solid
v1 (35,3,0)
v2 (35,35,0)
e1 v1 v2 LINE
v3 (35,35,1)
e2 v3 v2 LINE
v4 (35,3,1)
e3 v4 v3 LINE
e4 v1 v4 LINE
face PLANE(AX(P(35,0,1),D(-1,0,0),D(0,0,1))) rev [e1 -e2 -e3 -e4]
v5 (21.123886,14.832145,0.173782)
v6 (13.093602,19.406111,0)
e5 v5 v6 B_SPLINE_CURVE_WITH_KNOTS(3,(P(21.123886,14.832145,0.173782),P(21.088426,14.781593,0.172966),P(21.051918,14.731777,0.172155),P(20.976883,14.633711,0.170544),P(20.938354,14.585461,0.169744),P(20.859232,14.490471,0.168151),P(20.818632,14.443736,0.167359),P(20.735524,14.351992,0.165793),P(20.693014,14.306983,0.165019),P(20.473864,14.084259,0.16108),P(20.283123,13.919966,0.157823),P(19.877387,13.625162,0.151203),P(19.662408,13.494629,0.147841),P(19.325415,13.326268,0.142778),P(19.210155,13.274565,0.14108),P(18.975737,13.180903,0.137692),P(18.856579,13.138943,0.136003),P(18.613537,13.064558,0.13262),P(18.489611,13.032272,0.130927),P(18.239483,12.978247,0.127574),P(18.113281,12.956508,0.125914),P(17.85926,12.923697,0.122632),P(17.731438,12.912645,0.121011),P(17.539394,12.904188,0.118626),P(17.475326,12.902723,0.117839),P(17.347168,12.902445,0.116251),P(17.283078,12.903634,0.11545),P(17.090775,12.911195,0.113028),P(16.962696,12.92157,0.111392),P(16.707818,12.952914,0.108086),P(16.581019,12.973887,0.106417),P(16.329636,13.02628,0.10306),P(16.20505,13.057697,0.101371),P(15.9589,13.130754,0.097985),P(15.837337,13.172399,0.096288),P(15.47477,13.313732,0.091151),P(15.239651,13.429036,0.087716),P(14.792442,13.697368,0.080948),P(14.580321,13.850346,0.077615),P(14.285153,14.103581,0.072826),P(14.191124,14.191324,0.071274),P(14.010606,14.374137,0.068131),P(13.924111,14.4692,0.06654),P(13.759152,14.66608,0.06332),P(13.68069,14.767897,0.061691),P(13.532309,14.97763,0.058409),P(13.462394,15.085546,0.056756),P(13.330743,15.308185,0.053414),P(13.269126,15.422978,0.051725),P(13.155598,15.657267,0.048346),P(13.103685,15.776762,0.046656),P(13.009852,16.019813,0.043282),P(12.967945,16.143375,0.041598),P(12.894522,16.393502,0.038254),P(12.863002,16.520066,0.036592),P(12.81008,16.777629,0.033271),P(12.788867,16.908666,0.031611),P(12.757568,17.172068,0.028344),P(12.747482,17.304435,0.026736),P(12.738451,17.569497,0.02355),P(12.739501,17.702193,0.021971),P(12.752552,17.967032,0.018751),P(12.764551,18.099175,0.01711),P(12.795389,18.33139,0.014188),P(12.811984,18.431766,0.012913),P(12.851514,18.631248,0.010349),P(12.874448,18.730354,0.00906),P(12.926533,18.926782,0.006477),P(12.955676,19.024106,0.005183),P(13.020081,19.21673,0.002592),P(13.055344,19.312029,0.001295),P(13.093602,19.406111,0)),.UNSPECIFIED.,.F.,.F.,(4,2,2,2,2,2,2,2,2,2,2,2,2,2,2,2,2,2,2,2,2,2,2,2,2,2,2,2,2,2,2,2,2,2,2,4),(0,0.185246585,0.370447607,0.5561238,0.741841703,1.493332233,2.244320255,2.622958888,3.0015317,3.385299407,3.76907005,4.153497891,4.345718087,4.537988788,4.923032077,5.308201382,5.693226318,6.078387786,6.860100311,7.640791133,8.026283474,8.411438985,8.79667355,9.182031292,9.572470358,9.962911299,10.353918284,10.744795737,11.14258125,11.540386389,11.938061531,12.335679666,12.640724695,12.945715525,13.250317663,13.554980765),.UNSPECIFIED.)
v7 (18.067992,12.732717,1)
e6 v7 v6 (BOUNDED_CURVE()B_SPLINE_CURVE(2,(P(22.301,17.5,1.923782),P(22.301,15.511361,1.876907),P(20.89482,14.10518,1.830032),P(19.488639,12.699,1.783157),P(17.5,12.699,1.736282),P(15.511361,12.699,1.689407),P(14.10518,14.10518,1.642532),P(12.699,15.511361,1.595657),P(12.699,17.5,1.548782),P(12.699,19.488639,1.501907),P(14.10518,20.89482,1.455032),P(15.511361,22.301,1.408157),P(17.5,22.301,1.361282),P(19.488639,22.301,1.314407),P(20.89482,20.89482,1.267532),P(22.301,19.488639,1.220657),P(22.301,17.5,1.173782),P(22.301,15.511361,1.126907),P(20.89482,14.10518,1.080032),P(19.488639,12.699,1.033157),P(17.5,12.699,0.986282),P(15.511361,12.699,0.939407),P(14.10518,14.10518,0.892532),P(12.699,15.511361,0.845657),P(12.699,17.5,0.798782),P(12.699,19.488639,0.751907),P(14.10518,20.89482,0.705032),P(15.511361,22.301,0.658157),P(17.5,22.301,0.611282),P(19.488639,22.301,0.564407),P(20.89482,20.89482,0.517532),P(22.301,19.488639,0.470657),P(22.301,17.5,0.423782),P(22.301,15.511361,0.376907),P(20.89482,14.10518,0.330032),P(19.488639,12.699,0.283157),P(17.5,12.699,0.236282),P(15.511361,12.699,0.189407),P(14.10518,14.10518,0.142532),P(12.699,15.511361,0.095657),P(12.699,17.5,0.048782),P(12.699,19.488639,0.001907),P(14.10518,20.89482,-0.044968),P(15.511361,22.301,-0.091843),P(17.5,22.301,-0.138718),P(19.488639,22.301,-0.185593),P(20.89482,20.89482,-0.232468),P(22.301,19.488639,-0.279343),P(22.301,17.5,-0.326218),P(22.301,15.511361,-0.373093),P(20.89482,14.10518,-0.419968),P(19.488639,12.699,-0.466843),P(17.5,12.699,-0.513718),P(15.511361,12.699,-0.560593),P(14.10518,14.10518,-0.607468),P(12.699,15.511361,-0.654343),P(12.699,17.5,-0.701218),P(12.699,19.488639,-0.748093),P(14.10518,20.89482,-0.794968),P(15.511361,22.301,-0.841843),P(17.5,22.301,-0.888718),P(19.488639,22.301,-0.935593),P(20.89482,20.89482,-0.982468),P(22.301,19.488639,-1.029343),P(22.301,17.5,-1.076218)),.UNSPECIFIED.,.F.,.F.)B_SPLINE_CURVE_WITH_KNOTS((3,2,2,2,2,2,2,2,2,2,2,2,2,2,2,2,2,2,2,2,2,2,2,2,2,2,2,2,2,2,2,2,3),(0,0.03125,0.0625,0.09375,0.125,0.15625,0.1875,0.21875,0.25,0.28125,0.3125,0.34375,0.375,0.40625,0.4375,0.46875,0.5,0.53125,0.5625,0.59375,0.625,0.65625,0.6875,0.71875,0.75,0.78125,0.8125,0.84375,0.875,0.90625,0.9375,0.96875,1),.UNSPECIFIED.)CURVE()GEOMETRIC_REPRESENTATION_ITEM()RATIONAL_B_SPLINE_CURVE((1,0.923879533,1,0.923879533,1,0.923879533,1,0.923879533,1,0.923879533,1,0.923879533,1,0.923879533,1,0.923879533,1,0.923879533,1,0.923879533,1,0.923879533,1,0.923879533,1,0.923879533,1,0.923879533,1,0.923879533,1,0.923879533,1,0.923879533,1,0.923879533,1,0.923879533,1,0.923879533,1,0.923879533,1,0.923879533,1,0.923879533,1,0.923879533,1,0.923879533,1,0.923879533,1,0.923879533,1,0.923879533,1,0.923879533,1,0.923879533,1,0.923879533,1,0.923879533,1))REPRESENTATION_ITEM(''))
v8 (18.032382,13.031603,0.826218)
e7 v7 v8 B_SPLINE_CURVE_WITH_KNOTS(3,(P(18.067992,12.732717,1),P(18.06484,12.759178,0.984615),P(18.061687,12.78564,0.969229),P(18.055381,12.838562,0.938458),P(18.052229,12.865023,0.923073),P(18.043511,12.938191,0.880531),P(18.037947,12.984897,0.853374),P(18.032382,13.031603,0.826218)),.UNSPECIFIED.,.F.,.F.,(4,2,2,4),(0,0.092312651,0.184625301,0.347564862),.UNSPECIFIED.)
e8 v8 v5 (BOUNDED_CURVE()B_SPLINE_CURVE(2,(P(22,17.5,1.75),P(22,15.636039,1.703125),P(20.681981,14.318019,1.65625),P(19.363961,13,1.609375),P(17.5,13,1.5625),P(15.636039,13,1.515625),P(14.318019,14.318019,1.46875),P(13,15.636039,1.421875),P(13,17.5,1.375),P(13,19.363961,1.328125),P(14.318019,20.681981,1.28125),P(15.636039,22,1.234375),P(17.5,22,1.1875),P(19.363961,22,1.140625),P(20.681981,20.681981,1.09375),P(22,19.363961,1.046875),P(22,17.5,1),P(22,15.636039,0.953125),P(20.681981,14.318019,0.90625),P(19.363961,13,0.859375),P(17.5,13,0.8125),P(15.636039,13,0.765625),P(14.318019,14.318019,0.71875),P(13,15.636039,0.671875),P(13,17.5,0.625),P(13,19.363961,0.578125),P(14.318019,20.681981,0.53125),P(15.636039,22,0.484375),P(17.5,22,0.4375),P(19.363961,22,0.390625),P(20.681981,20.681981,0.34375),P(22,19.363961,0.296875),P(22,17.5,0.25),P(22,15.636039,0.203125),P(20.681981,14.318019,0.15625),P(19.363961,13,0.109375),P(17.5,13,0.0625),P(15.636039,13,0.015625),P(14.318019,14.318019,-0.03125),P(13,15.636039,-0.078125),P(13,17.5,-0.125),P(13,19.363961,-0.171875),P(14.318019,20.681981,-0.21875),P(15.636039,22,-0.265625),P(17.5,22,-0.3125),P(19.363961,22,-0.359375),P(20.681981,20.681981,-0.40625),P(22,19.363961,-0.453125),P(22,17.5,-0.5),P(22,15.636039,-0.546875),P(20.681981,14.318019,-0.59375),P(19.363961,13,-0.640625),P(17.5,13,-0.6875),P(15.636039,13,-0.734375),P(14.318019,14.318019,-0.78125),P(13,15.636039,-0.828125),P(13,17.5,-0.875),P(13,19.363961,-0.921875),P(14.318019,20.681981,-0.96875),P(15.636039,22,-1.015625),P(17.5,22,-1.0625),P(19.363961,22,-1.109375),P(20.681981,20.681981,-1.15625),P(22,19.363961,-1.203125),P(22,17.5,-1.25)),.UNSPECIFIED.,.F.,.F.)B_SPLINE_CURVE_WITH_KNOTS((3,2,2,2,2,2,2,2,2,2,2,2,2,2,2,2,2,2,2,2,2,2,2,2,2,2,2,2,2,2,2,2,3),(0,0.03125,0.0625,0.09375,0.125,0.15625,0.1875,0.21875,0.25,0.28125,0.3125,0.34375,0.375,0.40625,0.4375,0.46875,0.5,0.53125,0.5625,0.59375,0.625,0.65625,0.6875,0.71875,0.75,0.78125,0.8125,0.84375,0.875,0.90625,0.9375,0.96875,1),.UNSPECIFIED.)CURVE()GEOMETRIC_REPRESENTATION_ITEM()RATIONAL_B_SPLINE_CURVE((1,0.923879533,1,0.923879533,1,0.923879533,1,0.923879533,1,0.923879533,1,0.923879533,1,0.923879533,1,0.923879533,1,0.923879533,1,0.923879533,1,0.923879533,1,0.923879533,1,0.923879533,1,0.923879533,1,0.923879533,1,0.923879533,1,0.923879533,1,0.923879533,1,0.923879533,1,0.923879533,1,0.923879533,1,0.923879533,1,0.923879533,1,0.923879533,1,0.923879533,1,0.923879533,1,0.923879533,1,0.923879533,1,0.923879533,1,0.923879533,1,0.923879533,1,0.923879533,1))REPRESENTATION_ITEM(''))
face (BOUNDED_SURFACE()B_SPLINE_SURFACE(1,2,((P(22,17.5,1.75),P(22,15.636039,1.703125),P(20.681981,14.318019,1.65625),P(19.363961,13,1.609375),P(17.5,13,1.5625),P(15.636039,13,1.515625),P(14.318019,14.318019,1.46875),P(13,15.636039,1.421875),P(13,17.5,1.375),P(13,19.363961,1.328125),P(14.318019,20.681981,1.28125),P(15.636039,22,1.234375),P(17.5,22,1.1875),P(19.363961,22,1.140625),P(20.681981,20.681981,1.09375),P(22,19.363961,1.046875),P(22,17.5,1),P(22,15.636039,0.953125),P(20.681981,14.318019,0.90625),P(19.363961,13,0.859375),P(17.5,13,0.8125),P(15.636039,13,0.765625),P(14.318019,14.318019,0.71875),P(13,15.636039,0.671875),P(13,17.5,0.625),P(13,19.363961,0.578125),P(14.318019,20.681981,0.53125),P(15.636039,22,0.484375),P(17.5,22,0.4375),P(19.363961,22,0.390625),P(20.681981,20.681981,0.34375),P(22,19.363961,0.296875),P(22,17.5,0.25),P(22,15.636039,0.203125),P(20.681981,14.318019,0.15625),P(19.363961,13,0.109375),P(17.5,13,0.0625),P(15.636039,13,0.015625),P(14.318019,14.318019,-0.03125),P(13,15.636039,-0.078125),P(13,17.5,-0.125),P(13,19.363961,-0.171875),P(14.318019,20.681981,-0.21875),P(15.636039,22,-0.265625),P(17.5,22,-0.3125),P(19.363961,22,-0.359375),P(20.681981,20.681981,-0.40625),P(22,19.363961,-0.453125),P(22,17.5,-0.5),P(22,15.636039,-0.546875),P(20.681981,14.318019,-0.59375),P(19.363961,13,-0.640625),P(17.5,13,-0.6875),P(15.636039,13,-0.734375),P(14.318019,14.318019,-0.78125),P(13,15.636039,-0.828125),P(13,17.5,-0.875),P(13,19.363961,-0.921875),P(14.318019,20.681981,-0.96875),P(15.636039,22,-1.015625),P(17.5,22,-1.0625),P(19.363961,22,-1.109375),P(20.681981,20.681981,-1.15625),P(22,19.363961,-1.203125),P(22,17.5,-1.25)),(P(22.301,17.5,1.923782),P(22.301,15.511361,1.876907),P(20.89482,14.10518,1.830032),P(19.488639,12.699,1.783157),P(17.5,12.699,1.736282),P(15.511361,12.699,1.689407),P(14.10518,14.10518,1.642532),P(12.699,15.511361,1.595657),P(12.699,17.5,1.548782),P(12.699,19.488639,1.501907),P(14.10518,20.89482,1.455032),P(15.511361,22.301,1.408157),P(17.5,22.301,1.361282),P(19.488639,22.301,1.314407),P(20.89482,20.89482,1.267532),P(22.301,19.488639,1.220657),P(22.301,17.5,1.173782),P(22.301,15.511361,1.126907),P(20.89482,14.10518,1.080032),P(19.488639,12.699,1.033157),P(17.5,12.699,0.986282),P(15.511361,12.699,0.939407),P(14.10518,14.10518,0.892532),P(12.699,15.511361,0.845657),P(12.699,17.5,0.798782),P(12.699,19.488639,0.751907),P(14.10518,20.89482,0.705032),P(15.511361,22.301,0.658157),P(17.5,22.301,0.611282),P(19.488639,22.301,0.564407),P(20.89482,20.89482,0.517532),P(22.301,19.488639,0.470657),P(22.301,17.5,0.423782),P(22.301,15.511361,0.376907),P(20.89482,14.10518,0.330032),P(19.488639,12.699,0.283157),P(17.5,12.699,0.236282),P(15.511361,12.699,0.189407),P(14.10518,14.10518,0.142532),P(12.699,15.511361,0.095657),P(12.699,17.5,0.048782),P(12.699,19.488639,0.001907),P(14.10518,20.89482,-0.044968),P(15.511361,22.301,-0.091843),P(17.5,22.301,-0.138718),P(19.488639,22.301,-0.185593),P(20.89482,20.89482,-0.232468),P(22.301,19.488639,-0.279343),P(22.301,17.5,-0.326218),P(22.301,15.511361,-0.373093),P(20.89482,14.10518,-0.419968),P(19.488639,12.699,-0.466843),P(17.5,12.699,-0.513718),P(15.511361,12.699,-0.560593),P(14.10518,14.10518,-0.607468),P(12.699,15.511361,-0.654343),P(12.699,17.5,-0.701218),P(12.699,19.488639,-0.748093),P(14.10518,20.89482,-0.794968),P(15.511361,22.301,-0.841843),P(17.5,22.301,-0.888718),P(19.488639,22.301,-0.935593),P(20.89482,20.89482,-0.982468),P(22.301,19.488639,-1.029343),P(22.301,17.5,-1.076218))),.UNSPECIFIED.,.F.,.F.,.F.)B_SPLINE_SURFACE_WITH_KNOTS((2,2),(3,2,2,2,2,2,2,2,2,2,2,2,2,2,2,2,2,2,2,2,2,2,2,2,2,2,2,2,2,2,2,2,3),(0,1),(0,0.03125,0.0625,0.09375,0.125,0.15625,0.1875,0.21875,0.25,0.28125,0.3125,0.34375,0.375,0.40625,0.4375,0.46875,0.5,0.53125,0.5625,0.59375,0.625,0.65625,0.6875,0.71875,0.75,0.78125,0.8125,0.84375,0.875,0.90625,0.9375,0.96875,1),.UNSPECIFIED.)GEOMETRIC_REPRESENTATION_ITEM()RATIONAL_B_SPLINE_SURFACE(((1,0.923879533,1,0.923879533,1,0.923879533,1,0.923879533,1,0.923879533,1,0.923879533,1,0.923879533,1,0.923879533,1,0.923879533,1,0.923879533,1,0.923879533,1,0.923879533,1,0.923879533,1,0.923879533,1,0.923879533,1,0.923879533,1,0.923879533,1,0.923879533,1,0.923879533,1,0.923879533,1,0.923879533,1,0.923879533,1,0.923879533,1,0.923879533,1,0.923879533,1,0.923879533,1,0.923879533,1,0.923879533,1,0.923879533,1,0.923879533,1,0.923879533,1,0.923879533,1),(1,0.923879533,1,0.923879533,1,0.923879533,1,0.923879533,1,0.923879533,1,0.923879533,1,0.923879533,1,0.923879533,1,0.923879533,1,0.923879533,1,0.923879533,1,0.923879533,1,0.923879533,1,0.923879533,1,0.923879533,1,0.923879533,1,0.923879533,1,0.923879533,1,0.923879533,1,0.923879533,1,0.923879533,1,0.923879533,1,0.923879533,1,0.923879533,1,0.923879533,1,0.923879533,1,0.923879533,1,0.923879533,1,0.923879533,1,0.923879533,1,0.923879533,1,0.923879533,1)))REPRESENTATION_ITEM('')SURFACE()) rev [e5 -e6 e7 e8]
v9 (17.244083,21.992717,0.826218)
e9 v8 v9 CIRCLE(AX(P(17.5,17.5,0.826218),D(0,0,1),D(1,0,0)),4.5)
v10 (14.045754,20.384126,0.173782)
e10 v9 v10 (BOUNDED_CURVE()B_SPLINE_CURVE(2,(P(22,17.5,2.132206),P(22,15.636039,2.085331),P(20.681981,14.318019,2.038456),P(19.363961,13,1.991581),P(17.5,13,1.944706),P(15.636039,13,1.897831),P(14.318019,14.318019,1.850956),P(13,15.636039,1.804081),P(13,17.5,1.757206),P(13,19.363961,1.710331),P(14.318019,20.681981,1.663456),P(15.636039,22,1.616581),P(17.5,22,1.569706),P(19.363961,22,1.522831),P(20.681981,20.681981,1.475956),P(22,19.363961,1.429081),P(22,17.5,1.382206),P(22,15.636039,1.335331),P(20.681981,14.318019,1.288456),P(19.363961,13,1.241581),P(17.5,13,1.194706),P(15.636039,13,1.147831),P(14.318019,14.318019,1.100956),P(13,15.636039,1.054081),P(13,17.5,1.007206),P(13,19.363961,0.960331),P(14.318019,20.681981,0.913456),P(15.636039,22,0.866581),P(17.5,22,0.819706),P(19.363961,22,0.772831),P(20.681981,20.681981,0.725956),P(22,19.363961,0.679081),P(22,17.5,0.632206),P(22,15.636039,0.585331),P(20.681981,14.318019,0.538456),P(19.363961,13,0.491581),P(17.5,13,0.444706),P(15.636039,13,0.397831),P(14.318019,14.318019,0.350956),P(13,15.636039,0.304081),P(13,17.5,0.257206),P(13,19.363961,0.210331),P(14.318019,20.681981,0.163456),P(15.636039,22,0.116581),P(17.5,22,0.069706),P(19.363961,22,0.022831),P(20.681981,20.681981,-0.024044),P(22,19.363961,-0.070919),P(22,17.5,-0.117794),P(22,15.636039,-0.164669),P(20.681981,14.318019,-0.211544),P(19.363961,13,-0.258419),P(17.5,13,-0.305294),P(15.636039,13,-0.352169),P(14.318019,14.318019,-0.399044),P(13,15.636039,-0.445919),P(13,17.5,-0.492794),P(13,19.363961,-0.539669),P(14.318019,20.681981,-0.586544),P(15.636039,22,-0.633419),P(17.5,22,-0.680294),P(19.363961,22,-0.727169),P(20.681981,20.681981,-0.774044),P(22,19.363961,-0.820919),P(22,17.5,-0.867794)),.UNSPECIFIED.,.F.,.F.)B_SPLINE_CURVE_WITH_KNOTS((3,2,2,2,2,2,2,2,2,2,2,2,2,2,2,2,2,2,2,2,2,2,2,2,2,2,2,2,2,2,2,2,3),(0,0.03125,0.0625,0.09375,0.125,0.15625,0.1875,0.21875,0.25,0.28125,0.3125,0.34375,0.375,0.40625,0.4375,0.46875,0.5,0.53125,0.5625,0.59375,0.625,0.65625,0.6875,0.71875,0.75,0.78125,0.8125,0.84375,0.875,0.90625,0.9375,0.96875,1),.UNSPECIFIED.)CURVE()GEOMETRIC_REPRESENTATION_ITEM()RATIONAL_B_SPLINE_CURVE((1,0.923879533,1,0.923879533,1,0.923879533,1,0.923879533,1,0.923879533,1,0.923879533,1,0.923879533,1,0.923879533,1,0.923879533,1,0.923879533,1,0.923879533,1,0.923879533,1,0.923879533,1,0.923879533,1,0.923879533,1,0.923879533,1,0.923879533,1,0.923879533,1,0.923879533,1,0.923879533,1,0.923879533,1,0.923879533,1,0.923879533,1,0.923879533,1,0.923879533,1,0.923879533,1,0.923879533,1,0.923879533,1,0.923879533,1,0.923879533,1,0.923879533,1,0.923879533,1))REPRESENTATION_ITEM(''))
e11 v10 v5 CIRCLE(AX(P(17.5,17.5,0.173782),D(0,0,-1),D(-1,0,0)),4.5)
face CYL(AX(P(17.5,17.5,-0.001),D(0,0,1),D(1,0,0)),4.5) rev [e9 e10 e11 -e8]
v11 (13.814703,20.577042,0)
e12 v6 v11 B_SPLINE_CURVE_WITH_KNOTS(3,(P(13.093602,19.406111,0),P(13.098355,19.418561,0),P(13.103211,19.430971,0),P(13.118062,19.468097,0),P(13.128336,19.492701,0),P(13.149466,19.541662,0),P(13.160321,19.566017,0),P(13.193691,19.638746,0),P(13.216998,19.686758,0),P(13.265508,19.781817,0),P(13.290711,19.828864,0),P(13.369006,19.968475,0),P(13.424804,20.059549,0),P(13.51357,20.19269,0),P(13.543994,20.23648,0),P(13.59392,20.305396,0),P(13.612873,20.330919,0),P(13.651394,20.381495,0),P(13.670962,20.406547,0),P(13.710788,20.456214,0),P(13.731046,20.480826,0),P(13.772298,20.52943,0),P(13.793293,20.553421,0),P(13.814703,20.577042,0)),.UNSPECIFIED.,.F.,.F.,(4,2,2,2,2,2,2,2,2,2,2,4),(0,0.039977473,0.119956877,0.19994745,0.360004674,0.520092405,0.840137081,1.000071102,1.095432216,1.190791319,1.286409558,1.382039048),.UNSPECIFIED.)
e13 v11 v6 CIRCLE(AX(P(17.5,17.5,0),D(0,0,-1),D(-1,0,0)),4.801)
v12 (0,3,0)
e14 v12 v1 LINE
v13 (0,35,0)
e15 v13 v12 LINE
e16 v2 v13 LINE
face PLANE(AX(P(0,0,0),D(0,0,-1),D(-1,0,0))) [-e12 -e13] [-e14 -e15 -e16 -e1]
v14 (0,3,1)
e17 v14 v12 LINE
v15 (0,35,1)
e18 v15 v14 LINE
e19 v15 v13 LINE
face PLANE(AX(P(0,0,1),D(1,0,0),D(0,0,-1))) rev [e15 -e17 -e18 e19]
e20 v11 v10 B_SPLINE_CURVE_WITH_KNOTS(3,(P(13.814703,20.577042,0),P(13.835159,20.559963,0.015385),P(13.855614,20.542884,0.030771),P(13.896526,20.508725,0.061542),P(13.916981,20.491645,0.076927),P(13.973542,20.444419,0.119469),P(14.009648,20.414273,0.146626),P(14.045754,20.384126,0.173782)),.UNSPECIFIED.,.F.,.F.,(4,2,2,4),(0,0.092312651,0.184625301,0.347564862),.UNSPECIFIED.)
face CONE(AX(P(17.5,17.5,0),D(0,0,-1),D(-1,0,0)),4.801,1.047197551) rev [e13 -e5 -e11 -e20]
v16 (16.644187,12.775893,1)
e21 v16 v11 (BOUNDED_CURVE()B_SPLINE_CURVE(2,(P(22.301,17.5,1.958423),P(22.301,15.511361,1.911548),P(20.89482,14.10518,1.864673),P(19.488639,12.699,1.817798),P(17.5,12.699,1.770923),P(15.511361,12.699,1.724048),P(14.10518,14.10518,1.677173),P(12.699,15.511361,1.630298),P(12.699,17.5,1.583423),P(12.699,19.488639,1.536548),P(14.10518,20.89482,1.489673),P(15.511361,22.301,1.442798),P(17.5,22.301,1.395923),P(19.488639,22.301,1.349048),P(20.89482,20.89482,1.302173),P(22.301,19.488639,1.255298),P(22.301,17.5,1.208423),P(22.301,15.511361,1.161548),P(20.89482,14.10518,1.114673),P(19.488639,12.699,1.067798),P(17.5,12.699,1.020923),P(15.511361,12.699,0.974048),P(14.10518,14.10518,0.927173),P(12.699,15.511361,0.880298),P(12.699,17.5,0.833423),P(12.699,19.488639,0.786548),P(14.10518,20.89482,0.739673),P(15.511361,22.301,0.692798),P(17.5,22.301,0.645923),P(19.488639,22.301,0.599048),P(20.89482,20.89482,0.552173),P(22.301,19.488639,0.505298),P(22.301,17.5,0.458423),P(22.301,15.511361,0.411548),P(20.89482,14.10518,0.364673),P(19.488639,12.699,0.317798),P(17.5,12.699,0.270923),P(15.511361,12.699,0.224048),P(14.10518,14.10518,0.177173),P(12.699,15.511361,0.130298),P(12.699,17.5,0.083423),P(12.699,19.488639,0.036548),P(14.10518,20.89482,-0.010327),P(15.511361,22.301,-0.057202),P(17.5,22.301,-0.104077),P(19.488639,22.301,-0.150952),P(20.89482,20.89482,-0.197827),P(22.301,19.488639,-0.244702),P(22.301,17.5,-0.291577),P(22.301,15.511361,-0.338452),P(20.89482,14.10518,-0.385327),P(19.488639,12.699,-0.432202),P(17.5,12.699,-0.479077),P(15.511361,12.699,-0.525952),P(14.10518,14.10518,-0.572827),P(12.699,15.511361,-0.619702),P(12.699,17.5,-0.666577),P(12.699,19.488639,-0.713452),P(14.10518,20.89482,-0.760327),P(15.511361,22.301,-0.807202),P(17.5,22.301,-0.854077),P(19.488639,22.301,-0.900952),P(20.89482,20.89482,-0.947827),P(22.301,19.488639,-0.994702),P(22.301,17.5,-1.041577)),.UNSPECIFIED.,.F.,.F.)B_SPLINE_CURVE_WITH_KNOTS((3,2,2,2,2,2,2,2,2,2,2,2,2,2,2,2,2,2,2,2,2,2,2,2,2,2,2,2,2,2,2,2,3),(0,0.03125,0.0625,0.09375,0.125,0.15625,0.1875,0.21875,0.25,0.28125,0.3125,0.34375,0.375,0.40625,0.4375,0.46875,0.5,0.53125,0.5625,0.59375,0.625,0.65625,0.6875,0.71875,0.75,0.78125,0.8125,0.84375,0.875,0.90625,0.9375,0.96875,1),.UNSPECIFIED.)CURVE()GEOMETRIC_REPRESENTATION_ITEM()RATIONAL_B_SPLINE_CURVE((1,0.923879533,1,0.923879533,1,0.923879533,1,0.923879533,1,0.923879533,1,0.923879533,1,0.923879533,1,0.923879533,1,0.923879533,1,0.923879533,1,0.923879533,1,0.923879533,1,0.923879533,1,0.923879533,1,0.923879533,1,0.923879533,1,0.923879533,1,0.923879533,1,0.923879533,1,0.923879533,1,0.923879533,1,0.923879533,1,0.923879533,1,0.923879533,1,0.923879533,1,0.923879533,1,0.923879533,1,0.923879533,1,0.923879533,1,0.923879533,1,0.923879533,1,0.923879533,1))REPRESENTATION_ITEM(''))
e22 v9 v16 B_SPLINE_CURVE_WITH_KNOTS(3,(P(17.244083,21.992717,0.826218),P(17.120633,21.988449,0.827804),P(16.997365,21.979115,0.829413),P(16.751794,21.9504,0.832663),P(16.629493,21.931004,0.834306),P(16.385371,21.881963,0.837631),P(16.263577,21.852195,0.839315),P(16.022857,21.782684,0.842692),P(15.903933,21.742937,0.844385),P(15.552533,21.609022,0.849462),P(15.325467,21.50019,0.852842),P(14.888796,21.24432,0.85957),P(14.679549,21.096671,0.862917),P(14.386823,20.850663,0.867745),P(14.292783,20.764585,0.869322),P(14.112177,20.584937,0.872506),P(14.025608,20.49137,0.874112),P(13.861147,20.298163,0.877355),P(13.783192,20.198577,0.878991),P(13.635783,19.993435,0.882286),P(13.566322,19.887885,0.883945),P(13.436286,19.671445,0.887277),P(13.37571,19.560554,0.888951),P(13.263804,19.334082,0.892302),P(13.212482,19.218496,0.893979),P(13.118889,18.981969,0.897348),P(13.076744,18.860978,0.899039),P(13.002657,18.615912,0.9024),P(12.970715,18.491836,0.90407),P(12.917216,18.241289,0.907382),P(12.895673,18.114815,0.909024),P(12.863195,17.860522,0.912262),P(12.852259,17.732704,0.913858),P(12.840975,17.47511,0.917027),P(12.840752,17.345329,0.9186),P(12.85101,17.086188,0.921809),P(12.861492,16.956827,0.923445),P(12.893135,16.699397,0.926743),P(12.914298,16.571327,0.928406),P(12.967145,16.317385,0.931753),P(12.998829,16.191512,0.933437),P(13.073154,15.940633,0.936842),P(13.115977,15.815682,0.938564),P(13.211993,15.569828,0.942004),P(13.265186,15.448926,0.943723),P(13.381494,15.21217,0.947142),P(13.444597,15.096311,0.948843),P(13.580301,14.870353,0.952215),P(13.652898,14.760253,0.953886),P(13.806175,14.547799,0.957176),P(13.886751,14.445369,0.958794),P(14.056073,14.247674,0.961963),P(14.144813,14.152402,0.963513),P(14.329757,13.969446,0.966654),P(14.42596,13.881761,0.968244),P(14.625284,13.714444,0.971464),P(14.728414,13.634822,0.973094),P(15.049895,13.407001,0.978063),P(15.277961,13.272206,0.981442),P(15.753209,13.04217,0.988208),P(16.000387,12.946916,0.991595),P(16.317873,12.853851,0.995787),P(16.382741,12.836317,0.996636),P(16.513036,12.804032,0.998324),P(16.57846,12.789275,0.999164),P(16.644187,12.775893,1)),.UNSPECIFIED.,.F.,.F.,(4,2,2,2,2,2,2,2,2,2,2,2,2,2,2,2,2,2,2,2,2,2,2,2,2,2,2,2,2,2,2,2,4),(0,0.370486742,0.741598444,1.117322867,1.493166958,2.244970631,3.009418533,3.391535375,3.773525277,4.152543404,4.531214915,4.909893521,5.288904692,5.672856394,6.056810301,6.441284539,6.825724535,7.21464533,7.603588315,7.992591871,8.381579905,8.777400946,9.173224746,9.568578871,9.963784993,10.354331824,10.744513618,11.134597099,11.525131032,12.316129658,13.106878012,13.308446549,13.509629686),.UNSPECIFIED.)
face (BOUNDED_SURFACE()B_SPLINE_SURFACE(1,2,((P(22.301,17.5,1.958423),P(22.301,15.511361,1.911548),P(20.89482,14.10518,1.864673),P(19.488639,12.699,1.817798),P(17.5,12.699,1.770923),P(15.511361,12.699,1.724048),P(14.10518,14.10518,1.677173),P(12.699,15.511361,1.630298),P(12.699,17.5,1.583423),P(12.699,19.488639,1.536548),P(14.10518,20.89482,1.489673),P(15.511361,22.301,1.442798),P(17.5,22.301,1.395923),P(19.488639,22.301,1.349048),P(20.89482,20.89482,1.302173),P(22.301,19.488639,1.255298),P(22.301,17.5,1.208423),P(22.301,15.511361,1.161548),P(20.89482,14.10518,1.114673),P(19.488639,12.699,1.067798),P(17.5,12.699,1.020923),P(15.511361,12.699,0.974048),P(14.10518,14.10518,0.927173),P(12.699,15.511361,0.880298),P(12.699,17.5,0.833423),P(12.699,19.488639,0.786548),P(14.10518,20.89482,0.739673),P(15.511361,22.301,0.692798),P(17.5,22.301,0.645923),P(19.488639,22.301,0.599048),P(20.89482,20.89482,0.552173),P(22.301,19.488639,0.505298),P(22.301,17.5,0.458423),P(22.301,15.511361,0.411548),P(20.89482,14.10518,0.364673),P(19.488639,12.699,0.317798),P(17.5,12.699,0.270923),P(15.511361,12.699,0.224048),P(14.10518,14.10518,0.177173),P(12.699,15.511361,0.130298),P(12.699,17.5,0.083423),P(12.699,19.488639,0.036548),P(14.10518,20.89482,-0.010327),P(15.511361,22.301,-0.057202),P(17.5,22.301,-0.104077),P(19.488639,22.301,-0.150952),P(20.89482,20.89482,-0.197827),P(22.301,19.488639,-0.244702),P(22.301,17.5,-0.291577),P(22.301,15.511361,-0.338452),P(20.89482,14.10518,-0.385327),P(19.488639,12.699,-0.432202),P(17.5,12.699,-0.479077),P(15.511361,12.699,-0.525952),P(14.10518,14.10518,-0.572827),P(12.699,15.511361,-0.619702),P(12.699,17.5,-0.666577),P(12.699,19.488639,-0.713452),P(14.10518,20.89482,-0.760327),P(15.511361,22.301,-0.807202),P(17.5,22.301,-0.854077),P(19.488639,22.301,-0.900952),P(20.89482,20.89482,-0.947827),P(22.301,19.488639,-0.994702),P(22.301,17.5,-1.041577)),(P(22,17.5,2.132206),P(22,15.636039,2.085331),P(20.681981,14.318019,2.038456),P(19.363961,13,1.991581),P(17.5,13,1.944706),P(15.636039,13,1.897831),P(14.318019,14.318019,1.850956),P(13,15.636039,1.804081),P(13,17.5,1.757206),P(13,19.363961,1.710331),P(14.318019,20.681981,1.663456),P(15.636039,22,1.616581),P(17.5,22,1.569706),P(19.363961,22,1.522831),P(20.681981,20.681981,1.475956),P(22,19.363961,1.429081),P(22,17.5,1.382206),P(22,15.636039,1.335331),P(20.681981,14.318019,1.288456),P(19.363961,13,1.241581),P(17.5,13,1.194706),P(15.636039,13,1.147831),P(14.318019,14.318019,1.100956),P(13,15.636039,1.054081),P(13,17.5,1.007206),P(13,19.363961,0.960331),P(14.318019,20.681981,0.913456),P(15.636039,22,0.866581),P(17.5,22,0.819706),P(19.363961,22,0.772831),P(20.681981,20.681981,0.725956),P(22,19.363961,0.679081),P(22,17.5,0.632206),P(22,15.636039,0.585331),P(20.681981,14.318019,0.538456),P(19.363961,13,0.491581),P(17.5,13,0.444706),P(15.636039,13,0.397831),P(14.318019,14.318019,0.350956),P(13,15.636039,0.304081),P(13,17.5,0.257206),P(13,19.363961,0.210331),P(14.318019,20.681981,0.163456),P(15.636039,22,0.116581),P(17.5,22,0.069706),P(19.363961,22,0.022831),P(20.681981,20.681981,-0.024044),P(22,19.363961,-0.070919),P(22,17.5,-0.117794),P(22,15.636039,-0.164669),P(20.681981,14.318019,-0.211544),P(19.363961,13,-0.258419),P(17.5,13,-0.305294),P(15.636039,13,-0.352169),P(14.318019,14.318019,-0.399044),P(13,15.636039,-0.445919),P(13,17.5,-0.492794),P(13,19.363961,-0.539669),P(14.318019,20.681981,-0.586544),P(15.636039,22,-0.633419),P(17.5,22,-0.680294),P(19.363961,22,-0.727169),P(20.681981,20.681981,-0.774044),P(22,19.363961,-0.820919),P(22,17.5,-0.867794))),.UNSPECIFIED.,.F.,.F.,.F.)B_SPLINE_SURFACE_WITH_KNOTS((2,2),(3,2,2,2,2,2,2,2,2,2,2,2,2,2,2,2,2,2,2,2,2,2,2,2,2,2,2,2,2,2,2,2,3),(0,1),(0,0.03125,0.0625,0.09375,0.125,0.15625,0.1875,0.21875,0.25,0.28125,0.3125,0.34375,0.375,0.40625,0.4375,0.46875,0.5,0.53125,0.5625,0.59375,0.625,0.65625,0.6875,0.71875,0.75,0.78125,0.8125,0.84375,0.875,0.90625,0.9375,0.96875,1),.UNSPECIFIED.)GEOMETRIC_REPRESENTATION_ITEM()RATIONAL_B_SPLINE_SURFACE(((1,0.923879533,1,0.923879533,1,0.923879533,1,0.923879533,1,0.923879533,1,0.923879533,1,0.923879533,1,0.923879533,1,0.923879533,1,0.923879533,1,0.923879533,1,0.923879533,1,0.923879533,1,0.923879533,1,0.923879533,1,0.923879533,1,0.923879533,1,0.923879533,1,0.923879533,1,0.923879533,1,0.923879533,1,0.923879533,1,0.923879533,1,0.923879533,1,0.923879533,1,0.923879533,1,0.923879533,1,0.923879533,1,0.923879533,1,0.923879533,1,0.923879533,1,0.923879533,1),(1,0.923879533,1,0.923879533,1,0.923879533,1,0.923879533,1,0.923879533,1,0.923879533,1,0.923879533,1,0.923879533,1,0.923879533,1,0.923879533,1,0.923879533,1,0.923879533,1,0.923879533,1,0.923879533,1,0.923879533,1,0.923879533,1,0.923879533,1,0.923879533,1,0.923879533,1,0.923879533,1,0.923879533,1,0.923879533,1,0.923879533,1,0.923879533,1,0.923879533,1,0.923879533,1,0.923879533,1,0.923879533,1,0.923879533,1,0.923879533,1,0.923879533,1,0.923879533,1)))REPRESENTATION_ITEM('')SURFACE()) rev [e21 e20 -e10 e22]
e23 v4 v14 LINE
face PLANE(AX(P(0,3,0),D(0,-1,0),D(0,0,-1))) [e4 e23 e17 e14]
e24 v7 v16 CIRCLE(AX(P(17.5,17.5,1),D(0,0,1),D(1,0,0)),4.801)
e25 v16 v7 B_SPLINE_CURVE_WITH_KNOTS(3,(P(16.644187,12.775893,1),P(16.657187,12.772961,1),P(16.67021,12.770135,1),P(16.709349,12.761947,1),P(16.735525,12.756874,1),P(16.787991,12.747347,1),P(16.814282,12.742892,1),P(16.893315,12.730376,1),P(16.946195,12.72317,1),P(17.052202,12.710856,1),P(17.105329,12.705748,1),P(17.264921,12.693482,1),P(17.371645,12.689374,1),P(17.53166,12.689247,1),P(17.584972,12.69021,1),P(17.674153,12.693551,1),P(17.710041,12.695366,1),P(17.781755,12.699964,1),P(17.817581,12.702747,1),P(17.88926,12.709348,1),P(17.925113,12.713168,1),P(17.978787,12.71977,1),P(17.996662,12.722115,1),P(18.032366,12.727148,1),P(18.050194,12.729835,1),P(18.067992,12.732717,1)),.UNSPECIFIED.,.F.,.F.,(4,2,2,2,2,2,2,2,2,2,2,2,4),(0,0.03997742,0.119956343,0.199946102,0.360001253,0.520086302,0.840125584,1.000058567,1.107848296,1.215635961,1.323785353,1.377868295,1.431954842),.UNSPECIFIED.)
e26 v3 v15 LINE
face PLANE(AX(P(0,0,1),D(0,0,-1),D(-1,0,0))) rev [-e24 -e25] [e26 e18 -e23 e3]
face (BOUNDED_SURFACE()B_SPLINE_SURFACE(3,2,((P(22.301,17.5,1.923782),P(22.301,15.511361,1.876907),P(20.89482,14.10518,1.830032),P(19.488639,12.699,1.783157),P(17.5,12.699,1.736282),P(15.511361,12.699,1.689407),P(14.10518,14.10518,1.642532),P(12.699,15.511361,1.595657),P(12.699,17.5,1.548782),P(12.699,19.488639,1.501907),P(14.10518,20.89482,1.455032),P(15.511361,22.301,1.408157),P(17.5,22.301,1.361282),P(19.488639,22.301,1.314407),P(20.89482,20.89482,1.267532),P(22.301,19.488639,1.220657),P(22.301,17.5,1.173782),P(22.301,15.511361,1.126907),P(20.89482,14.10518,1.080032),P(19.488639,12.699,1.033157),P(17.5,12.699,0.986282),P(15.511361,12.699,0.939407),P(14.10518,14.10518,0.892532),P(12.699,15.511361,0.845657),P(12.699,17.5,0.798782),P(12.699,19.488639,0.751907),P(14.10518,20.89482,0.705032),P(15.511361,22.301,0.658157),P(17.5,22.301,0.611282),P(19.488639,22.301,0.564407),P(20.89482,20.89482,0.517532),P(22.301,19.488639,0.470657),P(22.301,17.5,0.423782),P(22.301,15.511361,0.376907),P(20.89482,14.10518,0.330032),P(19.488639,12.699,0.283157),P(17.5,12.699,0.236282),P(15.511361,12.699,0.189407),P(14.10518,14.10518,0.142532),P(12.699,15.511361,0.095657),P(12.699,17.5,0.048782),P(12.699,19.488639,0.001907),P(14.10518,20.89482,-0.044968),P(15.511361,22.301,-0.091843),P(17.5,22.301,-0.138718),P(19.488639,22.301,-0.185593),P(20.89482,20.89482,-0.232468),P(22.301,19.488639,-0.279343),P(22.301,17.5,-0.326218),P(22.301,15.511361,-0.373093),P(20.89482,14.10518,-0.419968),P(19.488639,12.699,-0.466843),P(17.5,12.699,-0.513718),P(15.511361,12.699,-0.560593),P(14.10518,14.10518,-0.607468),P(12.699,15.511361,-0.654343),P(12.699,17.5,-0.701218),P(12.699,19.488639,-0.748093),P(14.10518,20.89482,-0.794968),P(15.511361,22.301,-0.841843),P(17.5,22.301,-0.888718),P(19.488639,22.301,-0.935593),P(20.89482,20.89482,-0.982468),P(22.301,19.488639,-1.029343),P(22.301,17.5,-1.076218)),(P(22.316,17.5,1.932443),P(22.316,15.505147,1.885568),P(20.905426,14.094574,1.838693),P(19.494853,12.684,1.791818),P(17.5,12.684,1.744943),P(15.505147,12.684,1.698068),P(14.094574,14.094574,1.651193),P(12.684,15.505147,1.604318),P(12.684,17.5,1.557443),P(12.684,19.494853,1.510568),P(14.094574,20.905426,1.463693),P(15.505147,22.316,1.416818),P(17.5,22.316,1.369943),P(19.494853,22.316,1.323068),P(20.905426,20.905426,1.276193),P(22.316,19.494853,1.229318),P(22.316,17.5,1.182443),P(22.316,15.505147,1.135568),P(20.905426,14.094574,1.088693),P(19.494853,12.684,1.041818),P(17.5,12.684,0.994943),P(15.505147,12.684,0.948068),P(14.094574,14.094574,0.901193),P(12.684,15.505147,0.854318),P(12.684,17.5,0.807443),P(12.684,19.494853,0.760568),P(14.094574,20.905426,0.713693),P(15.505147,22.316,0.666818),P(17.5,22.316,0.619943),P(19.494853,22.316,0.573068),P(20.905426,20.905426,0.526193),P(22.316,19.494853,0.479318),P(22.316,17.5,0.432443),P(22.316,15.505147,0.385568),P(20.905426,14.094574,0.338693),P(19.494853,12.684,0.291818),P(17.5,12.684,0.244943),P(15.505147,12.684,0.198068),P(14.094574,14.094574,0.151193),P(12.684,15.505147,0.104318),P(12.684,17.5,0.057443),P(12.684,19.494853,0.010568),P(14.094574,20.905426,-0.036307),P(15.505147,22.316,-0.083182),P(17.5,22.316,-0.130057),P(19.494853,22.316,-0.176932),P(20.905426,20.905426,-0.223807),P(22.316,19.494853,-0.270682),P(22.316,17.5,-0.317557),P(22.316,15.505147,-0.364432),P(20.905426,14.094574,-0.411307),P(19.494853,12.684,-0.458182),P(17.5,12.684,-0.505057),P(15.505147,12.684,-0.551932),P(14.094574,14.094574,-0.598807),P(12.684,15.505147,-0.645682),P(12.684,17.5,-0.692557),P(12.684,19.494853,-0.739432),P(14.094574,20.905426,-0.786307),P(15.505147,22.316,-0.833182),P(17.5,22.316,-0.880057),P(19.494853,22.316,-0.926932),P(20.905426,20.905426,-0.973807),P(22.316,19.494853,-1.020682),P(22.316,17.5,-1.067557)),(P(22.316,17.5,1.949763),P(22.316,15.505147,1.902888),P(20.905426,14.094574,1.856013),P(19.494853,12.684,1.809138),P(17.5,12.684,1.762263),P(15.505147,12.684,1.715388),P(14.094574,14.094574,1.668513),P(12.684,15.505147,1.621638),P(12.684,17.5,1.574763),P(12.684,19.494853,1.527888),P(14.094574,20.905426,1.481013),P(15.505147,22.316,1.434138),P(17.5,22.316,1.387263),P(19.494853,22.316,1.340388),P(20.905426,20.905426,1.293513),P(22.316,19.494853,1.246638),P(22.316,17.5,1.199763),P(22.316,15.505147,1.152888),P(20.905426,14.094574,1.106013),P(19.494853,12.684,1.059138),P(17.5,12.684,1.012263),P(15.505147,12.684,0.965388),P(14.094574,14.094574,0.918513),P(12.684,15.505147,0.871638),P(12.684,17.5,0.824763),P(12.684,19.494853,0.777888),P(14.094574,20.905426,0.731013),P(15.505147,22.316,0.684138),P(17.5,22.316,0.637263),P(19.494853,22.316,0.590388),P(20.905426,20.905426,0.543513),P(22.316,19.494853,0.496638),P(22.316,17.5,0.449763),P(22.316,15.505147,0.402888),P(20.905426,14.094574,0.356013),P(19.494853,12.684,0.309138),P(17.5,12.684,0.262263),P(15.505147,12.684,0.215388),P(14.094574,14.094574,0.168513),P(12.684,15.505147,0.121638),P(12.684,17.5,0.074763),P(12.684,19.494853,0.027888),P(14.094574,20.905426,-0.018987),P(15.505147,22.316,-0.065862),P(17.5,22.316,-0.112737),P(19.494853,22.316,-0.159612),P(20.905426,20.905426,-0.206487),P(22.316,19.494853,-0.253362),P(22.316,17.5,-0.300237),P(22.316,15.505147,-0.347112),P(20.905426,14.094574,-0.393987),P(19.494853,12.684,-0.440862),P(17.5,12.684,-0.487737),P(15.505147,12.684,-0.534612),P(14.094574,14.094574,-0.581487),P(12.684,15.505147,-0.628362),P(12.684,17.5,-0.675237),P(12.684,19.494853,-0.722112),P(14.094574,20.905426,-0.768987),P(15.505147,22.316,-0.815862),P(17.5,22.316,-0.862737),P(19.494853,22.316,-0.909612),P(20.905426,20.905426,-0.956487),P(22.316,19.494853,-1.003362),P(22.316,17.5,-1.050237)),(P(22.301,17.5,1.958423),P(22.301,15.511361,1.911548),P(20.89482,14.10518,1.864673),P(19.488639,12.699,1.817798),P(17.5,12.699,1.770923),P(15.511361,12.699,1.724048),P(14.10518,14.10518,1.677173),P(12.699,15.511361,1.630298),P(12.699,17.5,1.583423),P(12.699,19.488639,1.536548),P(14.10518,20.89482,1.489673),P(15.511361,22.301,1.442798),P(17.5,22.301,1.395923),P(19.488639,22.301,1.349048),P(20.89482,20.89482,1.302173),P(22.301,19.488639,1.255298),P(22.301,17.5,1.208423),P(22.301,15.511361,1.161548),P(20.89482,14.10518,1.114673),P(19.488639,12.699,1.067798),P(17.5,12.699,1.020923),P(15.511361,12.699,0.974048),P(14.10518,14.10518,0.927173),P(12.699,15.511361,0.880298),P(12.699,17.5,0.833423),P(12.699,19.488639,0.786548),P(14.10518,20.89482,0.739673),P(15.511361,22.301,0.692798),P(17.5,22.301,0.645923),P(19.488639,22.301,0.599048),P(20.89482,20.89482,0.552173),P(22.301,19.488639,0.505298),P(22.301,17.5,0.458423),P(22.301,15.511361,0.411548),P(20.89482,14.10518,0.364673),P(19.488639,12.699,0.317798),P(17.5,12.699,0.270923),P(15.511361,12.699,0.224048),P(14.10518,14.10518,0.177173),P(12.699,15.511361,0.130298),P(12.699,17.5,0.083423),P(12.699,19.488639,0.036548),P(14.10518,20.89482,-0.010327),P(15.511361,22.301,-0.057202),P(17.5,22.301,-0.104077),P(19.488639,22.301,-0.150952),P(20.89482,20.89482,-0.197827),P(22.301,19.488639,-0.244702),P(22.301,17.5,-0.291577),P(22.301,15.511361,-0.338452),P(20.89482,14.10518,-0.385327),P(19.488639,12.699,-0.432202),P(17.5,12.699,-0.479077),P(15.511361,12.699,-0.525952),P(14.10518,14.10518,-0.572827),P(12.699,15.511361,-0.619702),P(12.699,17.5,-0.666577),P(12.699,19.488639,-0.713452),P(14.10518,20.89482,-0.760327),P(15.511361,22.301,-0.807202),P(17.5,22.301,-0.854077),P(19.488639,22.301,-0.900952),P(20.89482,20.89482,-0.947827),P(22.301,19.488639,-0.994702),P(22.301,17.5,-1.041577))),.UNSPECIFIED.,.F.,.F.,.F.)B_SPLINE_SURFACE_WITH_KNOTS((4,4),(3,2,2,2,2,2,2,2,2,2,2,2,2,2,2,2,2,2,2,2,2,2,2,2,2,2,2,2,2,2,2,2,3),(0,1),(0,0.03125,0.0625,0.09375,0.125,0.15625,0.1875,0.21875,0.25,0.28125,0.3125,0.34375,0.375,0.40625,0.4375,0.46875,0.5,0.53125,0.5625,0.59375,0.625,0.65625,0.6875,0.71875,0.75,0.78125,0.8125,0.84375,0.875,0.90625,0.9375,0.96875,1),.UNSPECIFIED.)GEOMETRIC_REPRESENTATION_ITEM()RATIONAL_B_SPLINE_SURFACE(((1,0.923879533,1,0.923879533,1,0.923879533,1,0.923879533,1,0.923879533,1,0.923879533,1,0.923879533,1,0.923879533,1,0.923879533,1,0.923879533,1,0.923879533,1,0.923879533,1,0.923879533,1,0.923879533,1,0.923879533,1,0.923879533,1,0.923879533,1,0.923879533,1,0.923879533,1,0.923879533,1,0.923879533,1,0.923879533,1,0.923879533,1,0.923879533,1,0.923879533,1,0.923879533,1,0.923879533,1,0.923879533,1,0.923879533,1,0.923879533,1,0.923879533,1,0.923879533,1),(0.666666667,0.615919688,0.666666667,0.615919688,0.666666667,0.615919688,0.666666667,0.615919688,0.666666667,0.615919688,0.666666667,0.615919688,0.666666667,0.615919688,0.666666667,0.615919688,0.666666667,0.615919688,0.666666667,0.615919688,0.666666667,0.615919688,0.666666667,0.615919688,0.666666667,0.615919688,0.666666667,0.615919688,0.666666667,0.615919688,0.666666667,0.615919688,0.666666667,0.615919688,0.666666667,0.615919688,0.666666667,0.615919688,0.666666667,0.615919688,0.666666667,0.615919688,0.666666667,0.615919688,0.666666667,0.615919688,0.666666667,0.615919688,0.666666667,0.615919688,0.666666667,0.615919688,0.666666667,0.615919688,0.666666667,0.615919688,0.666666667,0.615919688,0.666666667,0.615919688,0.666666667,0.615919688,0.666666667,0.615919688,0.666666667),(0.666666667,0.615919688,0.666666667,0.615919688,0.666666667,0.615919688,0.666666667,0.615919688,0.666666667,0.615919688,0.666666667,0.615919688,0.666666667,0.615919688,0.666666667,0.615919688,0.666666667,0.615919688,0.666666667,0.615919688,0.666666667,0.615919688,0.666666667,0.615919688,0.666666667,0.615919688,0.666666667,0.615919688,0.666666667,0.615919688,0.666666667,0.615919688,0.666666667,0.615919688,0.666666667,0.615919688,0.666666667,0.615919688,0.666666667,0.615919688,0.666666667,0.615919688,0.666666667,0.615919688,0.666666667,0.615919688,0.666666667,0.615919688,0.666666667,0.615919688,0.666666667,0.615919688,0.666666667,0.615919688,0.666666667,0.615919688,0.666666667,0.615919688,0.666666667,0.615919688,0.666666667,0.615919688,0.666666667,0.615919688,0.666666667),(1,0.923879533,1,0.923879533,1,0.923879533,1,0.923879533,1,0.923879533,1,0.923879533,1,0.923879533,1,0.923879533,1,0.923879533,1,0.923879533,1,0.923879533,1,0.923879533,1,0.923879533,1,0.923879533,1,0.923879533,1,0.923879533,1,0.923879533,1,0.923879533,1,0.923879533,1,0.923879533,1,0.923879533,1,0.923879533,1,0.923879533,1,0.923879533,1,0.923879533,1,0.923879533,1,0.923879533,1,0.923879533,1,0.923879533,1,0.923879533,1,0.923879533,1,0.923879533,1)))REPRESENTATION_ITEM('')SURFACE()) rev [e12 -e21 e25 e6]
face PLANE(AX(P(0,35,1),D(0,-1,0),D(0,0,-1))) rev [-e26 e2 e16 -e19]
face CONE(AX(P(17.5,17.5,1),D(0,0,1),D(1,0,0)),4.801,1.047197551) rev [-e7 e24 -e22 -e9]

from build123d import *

# Parameters (mm, degrees)
SKETCH1_W           = 35
SKETCH1_H           = 35
BOSS_EXTRUDE1_DEPTH = 1
CUT_EXTRUDE1_REACH  = 51.508
SKETCH2_R           = 4.5
CUT_SWEEP9_PITCH    = 0.75
SKETCH26_W          = 35
SKETCH26_H          = 1
CUT_EXTRUDE4_DEPTH  = 3


with BuildPart() as part:
    # Sketch1 → Boss-Extrude1 (new body)
    with BuildSketch(Plane.XY):
        with Locations((17.5, 17.5)):
            Rectangle(SKETCH1_W, SKETCH1_H)
    extrude(amount=BOSS_EXTRUDE1_DEPTH)

    # Sketch2 → Cut-Extrude1 (cut, up to next)
    with BuildSketch(Plane.XY.offset(1), mode=Mode.PRIVATE) as cut_extrude1_sk1:
        with Locations((17.5, 17.5)):
            Circle(SKETCH2_R)
    cut_extrude1_tool1 = extrude(cut_extrude1_sk1.sketch, amount=-CUT_EXTRUDE1_REACH, mode=Mode.PRIVATE) & part.part
    add(cut_extrude1_tool1.solids().sort_by_distance((17.5, 17.5, 1))[0], mode=Mode.SUBTRACT)

    # Cut-Sweep9: the profile of Sketch22 profile screwed along a right-hand helix of 3 turns, 8 arcs to a turn; built about Z, then put on its axis
    cut_sweep9_z = Axis((0, 0, 0), (0, 0, 1))
    cut_sweep9_corners = [(4.4997, 0, -0.382379083), (4.4997, 0, 0.000173205), (4.801, 0, -0.173782431), (4.811, 0, -0.191102939), (4.801, 0, -0.208423447)]
    with BuildLine(mode=Mode.PRIVATE) as cut_sweep9_profile:
        Line(cut_sweep9_corners[0], cut_sweep9_corners[1])
        Line(cut_sweep9_corners[1], cut_sweep9_corners[2])
        Line(cut_sweep9_corners[4], cut_sweep9_corners[0])
        ThreePointArc((4.801, 0, -0.173782431), (4.808320508, 0, -0.181102939), (4.811, 0, -0.191102939))
        ThreePointArc((4.811, 0, -0.191102939), (4.808320508, 0, -0.201102939), (4.801, 0, -0.208423447))
    cut_sweep9_cap = Face(cut_sweep9_profile.wire())
    cut_sweep9_arcs = [((4.801, 0, -0.173782431), (4.811, 0, -0.179555934), (4.811, 0, -0.191102939), (1, 0.866025403784374, 1)), ((4.811, 0, -0.191102939), (4.811, 0, -0.202649944), (4.801, 0, -0.208423447), (1, 0.866025403784374, 1))]  # start, shoulder, end, weights
    cut_sweep9_turn_angles = [0, 22.5, 45, 67.5, 90, 112.5, 135, 157.5, 180, 202.5, 225, 247.5, 270, 292.5, 315, 337.5, 360]
    cut_sweep9_turn_weights = [1, 0.9238795325112867, 1, 0.9238795325112867, 1, 0.9238795325112867, 1, 0.9238795325112867, 1, 0.9238795325112867, 1, 0.9238795325112867, 1, 0.9238795325112867, 1, 0.9238795325112867, 1]
    cut_sweep9_turn_rails = [Edge.make_bspline([Vector(p[0], p[1], 0).rotate(cut_sweep9_z, cut_sweep9_turn_angles[k]) / cut_sweep9_turn_weights[k] + Vector(0, 0, p[2] + CUT_SWEEP9_PITCH * cut_sweep9_turn_angles[k] / 360) for k in range(17)], [0, 0, 0, 1, 1, 2, 2, 3, 3, 4, 4, 5, 5, 6, 6, 7, 7, 8, 8, 8], 2, cut_sweep9_turn_weights) for p in cut_sweep9_corners]
    cut_sweep9_turn_sides = [*[Face.make_surface_from_curves(cut_sweep9_turn_rails[p[0]], cut_sweep9_turn_rails[p[1]]) for p in [(0, 1), (1, 2), (4, 0)]], *[Face.make_bezier_surface([[Vector(p[j][0], p[j][1], 0).rotate(cut_sweep9_z, cut_sweep9_turn_angles[2 * i + k]) / cut_sweep9_turn_weights[2 * i + k] + Vector(0, 0, p[j][2] + CUT_SWEEP9_PITCH * cut_sweep9_turn_angles[2 * i + k] / 360) for k in range(3)] for j in range(3)], [[p[3][j] * cut_sweep9_turn_weights[2 * i + k] for k in range(3)] for j in range(3)]) for p in cut_sweep9_arcs for i in range(8)]]
    cut_sweep9 = Plane(origin=(17.5, 17.5, 1), x_dir=(1, 0, 0), z_dir=(0, 0, -1)) * Solid(Shell([*[p.moved(Location((0, 0, CUT_SWEEP9_PITCH * i))) for i in range(3) for p in cut_sweep9_turn_sides], cut_sweep9_cap, cut_sweep9_cap.rotate(cut_sweep9_z, 1080).moved(Location((0, 0, CUT_SWEEP9_PITCH * 1080 / 360)))]))
    add(cut_sweep9, mode=Mode.SUBTRACT)

    # Cut-Extrude2 cone 1 section (through the dimple's axis) → Cut-Extrude2 (revolve, cut)
    with BuildSketch(Plane(origin=(17.5, 17.5, 1), x_dir=(0, -1, 0), z_dir=(1, 0, 0))):
        Polygon((0, 0), (4.801, 0), (0, 2.771858642), align=None)
    revolve(axis=Axis((17.5, 17.5, 1), (0, 0, -1)), mode=Mode.SUBTRACT)

    # Cut-Extrude3 cone 1 section (through the dimple's axis) → Cut-Extrude3 (revolve, cut)
    with BuildSketch(Plane(origin=(17.5, 17.5, 0), x_dir=(0, 1, 0), z_dir=(1, 0, 0))):
        Polygon((0, 0), (4.801, 0), (0, 2.771858642), align=None)
    revolve(axis=Axis((17.5, 17.5, 0), (0, 0, 1)), mode=Mode.SUBTRACT)

    # Sketch26 → Cut-Extrude4 (cut)
    with BuildSketch(Plane.XZ):
        with Locations((17.5, 0.5)):
            Rectangle(SKETCH26_W, SKETCH26_H)
    extrude(amount=-CUT_EXTRUDE4_DEPTH, mode=Mode.SUBTRACT)


solid = part.part
